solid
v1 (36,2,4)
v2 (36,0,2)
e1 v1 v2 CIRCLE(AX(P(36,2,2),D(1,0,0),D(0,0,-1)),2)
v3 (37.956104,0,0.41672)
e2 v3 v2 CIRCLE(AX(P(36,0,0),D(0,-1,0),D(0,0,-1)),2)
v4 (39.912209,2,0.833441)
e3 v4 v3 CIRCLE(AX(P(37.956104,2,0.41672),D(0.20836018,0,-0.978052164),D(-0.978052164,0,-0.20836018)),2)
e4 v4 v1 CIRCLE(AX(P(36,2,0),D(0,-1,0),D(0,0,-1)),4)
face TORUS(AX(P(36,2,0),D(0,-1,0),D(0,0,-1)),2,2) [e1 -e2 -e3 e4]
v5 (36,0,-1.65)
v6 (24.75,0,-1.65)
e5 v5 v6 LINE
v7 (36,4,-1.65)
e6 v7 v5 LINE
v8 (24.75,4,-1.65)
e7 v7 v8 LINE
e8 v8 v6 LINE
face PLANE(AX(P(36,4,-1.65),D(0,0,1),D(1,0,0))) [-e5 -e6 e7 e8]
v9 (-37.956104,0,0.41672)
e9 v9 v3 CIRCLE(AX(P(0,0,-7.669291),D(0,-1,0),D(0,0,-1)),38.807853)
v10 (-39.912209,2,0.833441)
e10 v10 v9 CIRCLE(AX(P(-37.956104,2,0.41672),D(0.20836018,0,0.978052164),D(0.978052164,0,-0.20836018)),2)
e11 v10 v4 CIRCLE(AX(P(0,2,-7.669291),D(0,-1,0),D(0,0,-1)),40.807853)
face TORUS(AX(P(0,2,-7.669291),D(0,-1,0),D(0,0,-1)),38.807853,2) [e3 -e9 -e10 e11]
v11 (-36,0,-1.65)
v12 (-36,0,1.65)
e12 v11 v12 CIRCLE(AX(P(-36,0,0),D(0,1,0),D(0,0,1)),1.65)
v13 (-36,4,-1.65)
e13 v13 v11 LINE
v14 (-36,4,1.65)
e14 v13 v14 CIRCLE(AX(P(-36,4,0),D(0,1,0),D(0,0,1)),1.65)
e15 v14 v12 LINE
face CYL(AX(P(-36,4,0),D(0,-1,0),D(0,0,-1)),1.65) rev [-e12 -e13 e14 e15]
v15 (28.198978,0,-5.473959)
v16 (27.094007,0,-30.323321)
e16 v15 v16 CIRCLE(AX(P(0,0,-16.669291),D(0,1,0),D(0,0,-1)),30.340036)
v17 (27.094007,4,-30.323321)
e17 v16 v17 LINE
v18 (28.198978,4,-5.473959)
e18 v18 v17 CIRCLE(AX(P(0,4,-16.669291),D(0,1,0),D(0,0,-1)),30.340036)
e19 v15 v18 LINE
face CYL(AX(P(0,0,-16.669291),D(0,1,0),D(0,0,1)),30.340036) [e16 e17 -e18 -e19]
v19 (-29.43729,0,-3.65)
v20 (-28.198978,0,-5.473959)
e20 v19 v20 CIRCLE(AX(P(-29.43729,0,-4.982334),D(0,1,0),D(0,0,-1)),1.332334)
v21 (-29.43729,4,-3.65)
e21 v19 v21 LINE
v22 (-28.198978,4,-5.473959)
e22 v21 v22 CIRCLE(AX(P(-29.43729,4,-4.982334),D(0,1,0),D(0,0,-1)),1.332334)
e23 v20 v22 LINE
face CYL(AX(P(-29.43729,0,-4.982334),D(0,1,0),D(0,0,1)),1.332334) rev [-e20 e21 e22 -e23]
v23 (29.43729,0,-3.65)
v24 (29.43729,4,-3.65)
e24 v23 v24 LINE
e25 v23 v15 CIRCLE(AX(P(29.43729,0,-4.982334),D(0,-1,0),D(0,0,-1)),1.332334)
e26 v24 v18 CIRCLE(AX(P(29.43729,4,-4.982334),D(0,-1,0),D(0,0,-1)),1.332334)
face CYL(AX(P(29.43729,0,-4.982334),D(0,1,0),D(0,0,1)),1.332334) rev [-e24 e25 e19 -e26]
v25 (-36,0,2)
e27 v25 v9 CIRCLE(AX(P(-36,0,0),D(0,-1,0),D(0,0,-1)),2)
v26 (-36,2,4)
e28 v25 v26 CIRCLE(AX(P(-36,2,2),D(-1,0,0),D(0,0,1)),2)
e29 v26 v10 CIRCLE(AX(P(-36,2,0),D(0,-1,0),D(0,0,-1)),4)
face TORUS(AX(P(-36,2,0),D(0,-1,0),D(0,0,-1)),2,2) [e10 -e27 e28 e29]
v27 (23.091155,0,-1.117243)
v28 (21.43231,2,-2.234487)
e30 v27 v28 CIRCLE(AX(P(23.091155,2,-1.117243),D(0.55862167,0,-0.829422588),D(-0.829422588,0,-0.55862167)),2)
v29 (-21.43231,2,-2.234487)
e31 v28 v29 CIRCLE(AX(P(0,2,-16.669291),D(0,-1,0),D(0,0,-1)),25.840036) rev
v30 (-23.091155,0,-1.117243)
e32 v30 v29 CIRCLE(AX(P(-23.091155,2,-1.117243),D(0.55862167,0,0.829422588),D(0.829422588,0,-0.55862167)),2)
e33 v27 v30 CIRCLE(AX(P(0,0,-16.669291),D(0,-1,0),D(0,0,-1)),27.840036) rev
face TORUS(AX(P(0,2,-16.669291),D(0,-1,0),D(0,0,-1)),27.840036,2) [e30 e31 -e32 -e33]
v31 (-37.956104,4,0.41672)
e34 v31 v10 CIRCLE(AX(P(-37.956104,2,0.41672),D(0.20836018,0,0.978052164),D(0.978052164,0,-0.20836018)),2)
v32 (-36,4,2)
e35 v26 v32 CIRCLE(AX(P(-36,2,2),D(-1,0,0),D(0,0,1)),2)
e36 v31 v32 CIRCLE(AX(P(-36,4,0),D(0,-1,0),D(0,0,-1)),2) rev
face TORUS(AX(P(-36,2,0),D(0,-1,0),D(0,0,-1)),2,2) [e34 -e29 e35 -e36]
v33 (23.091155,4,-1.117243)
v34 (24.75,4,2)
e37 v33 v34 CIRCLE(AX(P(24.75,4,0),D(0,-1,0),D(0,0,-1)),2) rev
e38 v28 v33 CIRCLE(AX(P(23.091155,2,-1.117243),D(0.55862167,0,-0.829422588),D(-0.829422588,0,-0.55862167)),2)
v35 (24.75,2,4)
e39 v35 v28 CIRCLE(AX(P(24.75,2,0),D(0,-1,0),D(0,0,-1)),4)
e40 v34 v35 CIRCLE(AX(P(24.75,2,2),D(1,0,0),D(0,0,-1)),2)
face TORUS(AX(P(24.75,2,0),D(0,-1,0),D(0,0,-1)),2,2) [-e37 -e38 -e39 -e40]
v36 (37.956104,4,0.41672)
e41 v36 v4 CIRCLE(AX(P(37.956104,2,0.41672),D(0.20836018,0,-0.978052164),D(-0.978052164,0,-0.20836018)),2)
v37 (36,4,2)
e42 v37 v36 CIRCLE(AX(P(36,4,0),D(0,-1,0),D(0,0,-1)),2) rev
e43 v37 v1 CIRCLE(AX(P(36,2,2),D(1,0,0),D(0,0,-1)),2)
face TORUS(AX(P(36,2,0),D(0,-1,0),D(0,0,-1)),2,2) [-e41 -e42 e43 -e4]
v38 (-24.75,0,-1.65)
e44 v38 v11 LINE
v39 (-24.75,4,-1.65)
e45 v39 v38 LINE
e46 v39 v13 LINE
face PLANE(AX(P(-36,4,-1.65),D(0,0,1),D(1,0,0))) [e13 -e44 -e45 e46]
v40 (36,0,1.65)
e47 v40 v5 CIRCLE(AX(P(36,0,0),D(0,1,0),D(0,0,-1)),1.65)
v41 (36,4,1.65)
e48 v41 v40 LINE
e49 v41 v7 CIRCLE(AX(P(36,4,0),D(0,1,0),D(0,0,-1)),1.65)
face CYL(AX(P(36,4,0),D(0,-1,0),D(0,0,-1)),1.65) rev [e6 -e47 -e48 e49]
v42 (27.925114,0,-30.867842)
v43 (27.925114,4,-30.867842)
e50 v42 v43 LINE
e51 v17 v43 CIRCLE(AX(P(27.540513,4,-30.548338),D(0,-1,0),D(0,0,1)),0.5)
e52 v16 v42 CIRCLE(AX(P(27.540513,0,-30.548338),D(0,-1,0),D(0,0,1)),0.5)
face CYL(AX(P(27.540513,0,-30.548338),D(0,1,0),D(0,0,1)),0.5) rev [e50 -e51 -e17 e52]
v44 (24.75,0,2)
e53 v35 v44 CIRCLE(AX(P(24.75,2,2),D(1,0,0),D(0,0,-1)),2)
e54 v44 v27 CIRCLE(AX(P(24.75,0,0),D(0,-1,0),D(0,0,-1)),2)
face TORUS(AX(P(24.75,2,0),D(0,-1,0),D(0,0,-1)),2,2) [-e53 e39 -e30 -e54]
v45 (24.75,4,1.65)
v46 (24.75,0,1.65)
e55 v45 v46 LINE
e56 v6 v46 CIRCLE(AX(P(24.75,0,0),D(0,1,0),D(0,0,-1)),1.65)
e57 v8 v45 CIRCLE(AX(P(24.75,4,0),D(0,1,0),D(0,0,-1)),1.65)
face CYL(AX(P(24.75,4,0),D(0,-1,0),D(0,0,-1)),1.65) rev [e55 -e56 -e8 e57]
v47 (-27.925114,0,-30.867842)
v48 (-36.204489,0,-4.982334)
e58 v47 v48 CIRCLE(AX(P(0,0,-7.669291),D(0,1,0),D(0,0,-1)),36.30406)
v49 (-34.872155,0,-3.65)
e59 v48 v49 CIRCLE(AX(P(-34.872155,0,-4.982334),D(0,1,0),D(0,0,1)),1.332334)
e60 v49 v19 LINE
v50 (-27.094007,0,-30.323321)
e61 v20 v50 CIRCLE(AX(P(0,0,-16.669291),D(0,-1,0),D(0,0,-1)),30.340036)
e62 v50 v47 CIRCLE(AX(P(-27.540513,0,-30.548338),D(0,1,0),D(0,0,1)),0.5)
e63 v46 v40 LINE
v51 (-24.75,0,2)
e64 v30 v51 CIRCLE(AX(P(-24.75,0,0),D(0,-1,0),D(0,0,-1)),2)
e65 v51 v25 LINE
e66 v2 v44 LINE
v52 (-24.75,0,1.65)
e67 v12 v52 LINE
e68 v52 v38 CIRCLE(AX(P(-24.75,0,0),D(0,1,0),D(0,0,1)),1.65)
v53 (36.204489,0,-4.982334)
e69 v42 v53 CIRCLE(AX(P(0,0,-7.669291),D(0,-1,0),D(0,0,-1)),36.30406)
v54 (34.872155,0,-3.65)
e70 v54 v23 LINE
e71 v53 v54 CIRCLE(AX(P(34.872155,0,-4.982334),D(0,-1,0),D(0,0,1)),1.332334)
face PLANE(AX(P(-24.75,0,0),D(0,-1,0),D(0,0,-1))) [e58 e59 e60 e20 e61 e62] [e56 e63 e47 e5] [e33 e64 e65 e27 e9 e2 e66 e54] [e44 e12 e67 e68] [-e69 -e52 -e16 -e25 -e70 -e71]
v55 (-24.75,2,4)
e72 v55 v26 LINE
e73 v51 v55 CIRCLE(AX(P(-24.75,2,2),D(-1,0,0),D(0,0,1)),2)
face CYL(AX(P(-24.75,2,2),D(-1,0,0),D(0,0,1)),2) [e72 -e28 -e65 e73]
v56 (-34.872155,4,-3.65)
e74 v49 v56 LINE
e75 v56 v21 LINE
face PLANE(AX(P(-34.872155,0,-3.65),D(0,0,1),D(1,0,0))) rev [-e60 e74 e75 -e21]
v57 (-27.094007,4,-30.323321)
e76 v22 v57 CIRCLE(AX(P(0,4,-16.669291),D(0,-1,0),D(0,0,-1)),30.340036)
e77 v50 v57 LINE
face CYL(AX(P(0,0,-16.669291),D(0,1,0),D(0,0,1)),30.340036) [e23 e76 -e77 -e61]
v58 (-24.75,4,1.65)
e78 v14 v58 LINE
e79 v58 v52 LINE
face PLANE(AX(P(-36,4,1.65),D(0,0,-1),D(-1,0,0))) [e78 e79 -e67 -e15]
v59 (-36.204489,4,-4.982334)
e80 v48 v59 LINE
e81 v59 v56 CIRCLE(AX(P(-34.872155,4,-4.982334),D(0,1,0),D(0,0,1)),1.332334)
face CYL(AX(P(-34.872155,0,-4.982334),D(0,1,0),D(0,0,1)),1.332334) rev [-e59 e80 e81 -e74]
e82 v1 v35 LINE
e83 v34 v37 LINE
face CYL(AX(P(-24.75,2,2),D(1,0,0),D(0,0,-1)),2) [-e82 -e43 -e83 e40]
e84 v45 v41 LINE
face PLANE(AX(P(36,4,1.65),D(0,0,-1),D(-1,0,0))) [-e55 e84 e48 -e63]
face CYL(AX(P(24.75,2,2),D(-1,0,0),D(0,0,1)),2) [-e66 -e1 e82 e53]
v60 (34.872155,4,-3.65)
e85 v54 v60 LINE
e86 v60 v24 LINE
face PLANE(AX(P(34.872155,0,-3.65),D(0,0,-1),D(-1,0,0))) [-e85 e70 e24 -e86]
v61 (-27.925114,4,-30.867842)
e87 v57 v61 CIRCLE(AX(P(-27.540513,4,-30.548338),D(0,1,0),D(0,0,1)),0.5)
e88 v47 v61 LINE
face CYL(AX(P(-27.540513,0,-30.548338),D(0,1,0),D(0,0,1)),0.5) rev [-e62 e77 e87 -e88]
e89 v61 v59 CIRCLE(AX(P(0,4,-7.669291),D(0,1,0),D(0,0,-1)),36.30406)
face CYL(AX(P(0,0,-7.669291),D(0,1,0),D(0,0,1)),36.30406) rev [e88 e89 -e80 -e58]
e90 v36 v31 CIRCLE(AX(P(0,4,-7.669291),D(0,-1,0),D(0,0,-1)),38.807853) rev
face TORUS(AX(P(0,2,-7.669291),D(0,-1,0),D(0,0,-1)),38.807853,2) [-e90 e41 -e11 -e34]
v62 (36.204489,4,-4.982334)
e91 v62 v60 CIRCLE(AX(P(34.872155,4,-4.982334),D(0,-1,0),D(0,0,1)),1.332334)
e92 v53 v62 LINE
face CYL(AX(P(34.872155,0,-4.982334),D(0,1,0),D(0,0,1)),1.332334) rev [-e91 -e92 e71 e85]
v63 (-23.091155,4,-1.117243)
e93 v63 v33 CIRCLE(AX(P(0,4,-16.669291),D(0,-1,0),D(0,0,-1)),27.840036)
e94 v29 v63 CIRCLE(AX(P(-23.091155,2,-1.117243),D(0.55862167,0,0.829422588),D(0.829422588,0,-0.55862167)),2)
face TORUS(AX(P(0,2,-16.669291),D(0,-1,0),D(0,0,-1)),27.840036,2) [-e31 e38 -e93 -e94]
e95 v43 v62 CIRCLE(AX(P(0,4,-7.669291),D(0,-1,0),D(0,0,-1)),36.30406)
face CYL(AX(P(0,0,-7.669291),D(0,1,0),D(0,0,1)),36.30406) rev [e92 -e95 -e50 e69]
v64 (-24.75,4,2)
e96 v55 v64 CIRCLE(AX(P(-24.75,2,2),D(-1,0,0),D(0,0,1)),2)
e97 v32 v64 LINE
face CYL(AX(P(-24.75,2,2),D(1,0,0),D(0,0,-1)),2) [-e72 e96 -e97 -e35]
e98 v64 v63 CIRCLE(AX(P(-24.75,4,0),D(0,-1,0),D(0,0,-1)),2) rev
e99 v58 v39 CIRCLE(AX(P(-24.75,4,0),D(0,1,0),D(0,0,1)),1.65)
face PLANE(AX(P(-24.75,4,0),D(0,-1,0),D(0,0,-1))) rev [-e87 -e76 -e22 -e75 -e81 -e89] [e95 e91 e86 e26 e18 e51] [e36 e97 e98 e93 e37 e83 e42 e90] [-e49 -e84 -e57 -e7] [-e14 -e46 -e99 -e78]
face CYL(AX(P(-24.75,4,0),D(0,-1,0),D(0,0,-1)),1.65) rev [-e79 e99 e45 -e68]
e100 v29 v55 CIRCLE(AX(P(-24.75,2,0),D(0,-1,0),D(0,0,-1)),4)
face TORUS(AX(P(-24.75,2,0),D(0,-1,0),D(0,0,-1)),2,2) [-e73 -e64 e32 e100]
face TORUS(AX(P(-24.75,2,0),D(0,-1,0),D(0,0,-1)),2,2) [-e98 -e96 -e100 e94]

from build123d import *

# Parameters (mm, degrees)
EXTRUDE_1_DEPTH     = 4
FILLET_1_R          = 2
CUT_EXTRUDE_2_DEPTH = 64.492631813


with BuildPart() as part:
    # 草图2 → 凸台-拉伸1 (new body)
    with BuildSketch(Plane(origin=(0, 0, 0), x_dir=(1, 0, 0), z_dir=(0, 1, 0))):
        with BuildLine():
            Line((-24.75, -4), (-36, -4))
            ThreePointArc((-36, -4), (-38.516568808, -3.109160889), (-39.912208656, -0.833440718))
            ThreePointArc((-39.912208656, -0.833440718), (0, 48.477143514), (39.912208656, -0.833440718))
            ThreePointArc((39.912208656, -0.833440718), (38.516568808, -3.109160889), (36, -4))
            Line((36, -4), (24.75, -4))
            ThreePointArc((24.75, -4), (21.21885665, -1.879102616), (21.432309646, 2.234486679))
            ThreePointArc((21.432309646, 2.234486679), (0, 42.509326923), (-21.432309646, 2.234486679))
            ThreePointArc((-21.432309646, 2.234486679), (-21.21885665, -1.879102616), (-24.75, -4))
        make_face()
        with BuildLine():
            Line((-36, 1.65), (-24.75, 1.65))
            ThreePointArc((-24.75, 1.65), (-23.1, 0), (-24.75, -1.65))
            Line((-24.75, -1.65), (-36, -1.65))
            ThreePointArc((-36, -1.65), (-37.65, 0), (-36, 1.65))
        make_face(mode=Mode.SUBTRACT)
        with BuildLine():
            Line((36, 1.65), (24.75, 1.65))
            ThreePointArc((24.75, 1.65), (23.1, 0), (24.75, -1.65))
            Line((24.75, -1.65), (36, -1.65))
            ThreePointArc((36, -1.65), (37.65, 0), (36, 1.65))
        make_face(mode=Mode.SUBTRACT)
    extrude(amount=EXTRUDE_1_DEPTH)

    # 圆角1
    fillet_1_edges = [part.edges().sort_by_distance(p)[0] for p in [
        (-38.516568808, 0, 3.109160889),
        (0, 0, -48.477143514),
        (38.516568808, 0, 3.109160889),
        (30.375, 0, 4),
        (21.21885665, 0, 1.879102616),
        (0, 0, -42.509326923),
        (-21.21885665, 0, 1.879102616),
        (-21.21885665, 4, 1.879102616),
        (-30.375, 4, 4),
        (-38.516568808, 4, 3.109160889),
        (0, 4, -48.477143514),
        (38.516568808, 4, 3.109160889),
        (30.375, 4, 4),
        (21.21885665, 4, 1.879102616),
        (-30.375, 0, 4),
        (0, 4, -42.509326923),
    ]]
    fillet(fillet_1_edges, radius=FILLET_1_R - 0.0001)  # a hair under: the kernel refuses the full size

    # 草图4 → 切除-拉伸2 (cut, through all)
    with BuildSketch(Plane(origin=(0, 4, 0), x_dir=(1, 0, 0), z_dir=(0, 1, 0))):
        with BuildLine():
            Line((-34.872154706, 3.65), (-29.437290433, 3.65))
            ThreePointArc((-29.437290433, 3.65), (-28.334992254, 4.233967388), (-28.198977603, 5.473959002))
            ThreePointArc((-28.198977603, 5.473959002), (-30.310084994, 18.017081432), (-27.0940075, 30.323321324))
            ThreePointArc((-27.0940075, 30.323321324), (-27.266499401, 30.966568064), (-27.925113784, 30.867841575))
            ThreePointArc((-27.925113784, 30.867841575), (-34.578408784, 18.729054984), (-36.204488684, 4.982333979))
            ThreePointArc((-36.204488684, 4.982333979), (-35.814257097, 4.040231588), (-34.872154706, 3.65))
        make_face()
    cut_extrude_2 = extrude(amount=-CUT_EXTRUDE_2_DEPTH, mode=Mode.SUBTRACT)

    # 镜向1: 切除-拉伸2 across plane
    add(cut_extrude_2.mirror(Plane(origin=(0, 0, 0), x_dir=(0, 0, 1), z_dir=(1, 0, 0))), mode=Mode.SUBTRACT)


solid = part.part
